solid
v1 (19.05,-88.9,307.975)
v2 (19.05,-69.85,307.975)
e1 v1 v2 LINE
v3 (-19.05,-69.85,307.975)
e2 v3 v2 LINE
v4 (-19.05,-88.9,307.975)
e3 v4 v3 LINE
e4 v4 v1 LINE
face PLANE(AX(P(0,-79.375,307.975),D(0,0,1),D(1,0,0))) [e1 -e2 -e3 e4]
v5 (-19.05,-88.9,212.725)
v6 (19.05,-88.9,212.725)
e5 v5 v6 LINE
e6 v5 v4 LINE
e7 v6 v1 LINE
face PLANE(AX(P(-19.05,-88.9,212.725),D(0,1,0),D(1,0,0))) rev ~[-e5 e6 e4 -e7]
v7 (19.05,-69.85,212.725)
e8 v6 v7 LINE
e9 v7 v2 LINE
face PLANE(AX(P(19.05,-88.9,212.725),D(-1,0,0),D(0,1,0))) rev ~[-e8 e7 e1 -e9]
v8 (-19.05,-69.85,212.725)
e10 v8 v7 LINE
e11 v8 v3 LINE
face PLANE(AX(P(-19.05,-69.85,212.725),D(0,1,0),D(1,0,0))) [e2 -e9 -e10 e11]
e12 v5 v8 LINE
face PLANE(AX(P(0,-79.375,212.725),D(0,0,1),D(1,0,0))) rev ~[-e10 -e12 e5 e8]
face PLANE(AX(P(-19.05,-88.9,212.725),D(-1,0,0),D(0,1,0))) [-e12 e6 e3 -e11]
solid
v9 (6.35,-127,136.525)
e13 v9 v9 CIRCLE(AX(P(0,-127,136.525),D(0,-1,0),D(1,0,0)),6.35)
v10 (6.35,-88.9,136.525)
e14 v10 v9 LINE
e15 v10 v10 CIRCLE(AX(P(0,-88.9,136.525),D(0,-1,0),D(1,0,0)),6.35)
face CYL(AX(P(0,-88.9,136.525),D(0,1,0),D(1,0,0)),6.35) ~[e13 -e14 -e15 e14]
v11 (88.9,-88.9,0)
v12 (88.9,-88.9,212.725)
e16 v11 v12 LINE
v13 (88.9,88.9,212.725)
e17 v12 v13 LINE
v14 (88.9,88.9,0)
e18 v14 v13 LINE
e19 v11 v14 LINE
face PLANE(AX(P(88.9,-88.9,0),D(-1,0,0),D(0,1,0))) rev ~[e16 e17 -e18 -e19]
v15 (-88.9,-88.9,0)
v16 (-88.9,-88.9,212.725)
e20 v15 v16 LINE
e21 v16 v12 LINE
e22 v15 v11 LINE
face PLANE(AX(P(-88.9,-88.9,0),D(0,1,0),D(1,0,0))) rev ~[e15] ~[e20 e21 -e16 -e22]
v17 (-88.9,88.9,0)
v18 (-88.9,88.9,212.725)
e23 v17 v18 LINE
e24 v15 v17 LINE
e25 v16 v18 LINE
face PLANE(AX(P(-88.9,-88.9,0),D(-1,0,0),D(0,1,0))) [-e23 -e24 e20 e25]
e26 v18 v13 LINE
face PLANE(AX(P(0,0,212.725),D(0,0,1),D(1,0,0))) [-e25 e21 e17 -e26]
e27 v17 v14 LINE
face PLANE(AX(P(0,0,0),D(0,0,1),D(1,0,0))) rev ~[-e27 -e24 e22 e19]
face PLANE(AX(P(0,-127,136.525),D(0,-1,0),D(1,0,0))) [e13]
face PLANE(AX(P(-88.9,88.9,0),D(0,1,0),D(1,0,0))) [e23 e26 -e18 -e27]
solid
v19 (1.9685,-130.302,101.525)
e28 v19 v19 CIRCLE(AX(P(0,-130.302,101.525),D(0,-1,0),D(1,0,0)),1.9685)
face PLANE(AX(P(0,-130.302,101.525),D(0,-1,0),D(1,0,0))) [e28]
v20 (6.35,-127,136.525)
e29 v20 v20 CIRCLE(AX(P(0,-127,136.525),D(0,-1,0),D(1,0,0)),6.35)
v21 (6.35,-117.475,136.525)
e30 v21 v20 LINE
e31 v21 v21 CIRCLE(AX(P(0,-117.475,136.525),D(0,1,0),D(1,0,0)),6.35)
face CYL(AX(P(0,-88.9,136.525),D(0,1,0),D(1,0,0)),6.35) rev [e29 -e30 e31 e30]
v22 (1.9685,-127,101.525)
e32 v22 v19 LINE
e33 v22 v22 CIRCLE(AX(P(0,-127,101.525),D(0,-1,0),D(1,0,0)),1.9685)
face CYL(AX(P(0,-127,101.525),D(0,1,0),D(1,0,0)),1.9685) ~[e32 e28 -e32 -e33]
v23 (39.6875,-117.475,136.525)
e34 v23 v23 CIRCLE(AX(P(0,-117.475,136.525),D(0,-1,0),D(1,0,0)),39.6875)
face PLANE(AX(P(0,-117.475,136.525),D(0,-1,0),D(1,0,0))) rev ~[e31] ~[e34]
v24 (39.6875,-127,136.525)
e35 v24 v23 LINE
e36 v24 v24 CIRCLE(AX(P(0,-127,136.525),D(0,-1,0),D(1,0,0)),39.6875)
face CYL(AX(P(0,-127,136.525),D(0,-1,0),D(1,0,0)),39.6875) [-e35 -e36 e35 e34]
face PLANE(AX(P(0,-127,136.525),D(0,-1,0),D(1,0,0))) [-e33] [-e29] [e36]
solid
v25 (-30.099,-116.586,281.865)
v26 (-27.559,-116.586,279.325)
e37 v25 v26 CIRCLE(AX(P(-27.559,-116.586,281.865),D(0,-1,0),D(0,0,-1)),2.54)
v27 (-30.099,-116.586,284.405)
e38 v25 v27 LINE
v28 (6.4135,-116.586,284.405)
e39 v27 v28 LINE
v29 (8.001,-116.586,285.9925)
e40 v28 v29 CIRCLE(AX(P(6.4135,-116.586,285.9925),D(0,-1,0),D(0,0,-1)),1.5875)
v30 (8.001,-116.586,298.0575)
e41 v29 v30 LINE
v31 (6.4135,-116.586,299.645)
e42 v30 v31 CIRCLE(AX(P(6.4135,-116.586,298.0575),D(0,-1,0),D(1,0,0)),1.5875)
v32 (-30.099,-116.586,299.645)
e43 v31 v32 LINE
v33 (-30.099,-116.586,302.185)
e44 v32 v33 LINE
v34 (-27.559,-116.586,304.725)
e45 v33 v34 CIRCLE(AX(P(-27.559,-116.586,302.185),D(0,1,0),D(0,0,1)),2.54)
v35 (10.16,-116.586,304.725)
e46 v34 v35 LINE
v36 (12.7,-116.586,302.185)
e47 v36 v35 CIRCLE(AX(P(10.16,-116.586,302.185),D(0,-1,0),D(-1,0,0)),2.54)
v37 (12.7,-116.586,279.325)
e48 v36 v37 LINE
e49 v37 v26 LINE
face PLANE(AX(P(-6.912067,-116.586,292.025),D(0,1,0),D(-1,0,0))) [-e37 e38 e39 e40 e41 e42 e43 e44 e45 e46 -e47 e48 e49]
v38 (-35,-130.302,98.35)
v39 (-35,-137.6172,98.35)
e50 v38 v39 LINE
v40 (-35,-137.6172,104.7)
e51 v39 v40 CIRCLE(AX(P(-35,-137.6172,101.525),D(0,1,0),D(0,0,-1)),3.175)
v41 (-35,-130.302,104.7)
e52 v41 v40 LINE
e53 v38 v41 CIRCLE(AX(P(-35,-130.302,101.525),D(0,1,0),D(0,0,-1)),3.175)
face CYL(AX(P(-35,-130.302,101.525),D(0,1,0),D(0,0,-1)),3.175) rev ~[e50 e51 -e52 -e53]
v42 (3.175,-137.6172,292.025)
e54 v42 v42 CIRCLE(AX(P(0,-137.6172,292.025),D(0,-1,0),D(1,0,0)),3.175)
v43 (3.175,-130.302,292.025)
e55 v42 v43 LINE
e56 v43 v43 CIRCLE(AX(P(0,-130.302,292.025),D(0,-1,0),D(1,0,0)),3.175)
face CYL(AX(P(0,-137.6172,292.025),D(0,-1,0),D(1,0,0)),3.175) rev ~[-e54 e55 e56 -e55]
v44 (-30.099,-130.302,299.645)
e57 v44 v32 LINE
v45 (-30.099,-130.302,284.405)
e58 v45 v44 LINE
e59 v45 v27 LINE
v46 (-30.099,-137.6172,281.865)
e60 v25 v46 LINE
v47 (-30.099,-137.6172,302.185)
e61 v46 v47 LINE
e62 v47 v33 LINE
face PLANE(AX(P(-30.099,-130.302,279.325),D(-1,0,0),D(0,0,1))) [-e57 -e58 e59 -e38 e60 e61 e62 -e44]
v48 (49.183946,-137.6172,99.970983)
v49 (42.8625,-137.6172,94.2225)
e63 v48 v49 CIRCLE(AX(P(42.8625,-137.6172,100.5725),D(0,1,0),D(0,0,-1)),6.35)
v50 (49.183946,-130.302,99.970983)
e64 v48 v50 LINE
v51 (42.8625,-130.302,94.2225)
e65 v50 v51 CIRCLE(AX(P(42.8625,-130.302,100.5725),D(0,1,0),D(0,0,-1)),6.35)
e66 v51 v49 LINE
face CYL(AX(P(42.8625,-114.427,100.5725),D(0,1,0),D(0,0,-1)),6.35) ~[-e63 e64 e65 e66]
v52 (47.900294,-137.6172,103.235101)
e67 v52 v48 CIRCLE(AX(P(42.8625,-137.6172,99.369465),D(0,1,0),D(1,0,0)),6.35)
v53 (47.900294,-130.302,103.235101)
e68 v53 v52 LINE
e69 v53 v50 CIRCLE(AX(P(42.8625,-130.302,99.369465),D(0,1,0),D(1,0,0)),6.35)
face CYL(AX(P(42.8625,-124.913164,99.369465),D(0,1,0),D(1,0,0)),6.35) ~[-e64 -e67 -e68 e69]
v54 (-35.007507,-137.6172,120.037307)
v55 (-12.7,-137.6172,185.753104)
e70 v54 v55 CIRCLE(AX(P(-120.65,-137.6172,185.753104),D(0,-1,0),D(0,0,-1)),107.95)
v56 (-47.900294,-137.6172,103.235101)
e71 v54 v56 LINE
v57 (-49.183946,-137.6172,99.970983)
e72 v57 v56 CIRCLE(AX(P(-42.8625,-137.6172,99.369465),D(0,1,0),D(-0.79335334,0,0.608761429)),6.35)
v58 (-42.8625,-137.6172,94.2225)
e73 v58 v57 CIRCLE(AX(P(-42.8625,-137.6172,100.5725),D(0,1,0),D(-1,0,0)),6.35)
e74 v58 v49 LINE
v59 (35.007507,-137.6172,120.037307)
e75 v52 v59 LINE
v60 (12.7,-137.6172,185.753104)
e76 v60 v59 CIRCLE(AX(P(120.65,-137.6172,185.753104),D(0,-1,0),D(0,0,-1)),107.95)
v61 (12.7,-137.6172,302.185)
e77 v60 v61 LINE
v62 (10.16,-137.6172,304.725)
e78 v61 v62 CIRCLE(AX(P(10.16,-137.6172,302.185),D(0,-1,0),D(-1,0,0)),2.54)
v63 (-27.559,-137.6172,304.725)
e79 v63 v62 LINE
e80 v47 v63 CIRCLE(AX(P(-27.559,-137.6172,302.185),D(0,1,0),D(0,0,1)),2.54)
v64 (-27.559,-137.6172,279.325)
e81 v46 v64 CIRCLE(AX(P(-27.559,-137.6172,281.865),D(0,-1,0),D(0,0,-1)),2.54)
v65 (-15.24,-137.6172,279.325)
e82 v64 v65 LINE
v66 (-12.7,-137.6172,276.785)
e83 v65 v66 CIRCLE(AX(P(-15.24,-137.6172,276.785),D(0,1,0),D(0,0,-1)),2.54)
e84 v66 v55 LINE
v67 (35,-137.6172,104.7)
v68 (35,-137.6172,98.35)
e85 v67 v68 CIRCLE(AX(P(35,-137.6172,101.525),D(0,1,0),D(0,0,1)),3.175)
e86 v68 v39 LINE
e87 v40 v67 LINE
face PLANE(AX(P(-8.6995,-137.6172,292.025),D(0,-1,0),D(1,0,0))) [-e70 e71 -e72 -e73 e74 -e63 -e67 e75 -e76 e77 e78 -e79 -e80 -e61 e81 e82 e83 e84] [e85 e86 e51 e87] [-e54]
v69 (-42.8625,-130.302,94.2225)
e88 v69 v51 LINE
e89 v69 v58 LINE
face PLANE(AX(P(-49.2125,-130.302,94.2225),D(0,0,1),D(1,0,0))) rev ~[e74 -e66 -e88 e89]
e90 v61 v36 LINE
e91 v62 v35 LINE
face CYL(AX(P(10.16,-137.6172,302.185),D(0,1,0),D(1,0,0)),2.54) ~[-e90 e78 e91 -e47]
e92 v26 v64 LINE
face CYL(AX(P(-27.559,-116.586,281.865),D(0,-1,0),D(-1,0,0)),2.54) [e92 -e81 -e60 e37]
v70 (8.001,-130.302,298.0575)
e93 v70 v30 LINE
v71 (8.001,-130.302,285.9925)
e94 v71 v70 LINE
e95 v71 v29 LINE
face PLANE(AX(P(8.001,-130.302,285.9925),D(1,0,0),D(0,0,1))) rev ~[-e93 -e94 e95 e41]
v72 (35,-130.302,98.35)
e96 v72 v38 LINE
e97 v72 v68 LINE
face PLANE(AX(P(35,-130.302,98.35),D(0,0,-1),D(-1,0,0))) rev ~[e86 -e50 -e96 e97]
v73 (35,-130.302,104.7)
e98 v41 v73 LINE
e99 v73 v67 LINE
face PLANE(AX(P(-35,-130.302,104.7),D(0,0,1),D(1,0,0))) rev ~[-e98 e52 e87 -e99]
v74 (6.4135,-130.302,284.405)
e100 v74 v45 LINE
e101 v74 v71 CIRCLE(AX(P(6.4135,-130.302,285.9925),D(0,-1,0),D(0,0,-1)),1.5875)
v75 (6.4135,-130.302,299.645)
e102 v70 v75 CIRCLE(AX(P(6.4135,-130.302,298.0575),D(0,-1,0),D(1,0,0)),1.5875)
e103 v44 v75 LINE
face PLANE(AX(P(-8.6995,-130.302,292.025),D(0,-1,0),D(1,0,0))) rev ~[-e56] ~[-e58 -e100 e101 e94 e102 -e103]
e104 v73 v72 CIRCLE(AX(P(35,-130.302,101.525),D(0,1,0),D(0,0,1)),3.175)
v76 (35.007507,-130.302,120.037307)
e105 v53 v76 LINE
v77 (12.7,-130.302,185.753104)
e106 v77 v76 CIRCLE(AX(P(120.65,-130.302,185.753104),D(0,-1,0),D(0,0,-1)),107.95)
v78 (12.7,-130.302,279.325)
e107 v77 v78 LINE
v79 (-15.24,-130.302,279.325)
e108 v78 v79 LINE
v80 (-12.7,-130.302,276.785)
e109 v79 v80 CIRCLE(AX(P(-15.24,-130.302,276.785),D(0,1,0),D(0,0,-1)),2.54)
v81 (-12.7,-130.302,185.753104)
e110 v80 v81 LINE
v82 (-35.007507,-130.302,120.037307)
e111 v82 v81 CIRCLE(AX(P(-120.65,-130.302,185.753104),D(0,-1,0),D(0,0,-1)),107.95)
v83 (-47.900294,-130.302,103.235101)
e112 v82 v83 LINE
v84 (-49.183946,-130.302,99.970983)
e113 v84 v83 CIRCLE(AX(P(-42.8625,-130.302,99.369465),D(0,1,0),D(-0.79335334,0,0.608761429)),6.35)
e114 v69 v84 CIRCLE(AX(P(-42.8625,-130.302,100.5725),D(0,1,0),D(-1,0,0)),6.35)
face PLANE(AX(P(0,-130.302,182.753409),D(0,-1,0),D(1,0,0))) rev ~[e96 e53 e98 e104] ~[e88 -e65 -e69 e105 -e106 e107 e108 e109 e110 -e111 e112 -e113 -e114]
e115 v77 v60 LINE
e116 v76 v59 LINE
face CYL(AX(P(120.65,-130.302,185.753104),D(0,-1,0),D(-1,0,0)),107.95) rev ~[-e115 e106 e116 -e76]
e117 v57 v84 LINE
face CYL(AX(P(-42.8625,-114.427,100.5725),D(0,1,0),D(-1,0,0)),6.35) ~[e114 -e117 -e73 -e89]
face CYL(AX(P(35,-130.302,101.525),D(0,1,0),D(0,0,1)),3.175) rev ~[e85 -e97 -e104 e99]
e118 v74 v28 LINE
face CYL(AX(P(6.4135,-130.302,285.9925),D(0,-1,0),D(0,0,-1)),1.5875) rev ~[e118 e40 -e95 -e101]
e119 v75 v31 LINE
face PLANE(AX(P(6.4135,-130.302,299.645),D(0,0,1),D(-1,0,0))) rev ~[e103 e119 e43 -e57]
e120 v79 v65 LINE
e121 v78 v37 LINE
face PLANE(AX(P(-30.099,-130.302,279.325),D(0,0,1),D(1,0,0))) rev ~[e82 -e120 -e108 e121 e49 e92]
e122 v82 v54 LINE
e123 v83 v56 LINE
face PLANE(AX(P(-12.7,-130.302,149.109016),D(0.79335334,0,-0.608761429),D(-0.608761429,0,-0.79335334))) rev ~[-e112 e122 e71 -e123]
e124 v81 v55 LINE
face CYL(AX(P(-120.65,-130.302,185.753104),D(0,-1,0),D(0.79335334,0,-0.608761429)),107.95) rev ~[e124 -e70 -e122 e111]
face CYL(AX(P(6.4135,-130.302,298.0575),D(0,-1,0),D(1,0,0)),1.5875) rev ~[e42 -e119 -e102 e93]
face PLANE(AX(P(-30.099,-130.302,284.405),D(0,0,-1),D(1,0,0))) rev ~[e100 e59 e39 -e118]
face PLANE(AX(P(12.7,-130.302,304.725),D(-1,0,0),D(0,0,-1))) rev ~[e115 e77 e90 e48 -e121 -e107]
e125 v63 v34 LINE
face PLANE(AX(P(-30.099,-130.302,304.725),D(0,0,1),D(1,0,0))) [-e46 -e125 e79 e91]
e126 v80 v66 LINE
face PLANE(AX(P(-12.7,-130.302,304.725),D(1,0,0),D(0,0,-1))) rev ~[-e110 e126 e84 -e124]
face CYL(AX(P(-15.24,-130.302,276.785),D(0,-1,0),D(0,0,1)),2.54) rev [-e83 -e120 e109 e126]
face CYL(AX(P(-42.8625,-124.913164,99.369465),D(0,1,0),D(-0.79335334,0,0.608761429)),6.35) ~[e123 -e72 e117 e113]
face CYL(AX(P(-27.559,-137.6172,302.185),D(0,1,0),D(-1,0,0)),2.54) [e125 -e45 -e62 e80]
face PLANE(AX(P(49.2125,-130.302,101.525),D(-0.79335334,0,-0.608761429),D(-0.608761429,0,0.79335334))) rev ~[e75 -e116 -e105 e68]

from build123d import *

# Parameters (mm, degrees)
F0_W         = 177.8
F0_H         = 177.8
F1_DEPTH     = 212.725
F2_W         = 38.1
F2_H         = 19.05
F3_DEPTH     = 95.25
F4_R         = 6.35
F5_DEPTH     = 38.1
F6_R         = 39.6875
F7_DEPTH     = 9.525
F9_R         = 1.9685
F10_DEPTH    = 3.302
F12_DEPTH    = 7.3152
F14_T1_DEPTH = 18.0928727189
F14_T3_DEPTH = 39.0652
F15_R        = 107.95
F16_R        = 3.175
F17_DEPTH    = 7.3152
F19_DEPTH    = 13.716
F20_W        = 42.799
F20_H        = 25.4
F20_R        = 3.175
F21_DEPTH    = 7.3152
F22_R        = 2.54


# Not quite as in the source:
# - a fillet or chamfer that OpenCascade refuses, or shapes differently, is made with other operations: its cross-section is extruded or revolved along the edge and cut away or added


with BuildPart() as f1:
    # F0 (on Top) → F1 (new body)
    with BuildSketch(Plane.XY):
        Rectangle(F0_W, F0_H)
    extrude(amount=F1_DEPTH)

    # F4 (on face) → F5 (join)
    with BuildSketch(Plane.XZ.offset(88.9)):
        with Locations((0, 136.525)):
            Circle(F4_R)
    extrude(amount=F5_DEPTH)


with BuildPart() as f3:
    # F2 (on face) → F3 (new body)
    with BuildSketch(Plane.XY.offset(212.725)):
        with Locations((0, -79.375)):
            Rectangle(F2_W, F2_H)
    extrude(amount=F3_DEPTH)


with BuildPart() as f7:
    # F6 (on face) → F7 (new body)
    with BuildSketch(Plane.XZ.offset(127)):
        with Locations((0, 136.525)):
            Circle(F6_R)
    extrude(amount=-F7_DEPTH)

    # F8: cut F1
    add(f1.part, mode=Mode.SUBTRACT)

    # F9 (on face) → F10 (join)
    with BuildSketch(Plane.XZ.offset(127)):
        with Locations((0, 101.525)):
            Circle(F9_R)
    extrude(amount=F10_DEPTH)


with BuildPart() as f12:
    # F11 (on face) → F12 (new body)
    with BuildSketch(Plane.XZ.offset(130.302)):
        Polygon((-49.2125, 94.2225), (49.2125, 94.2225), (49.2125, 101.525), (12.7, 149.1090164259), (12.7, 304.725), (-12.7, 304.725), (-12.7, 149.1090164259), (-49.2125, 101.525), align=None)
        with BuildLine():
            Line((-35, 104.7), (35, 104.7))
            ThreePointArc((35, 104.7), (38.175, 101.525), (35, 98.35))
            Line((35, 98.35), (-35, 98.35))
            ThreePointArc((-35, 98.35), (-38.175, 101.525), (-35, 104.7))
        make_face(mode=Mode.SUBTRACT)
    extrude(amount=F12_DEPTH)

    # F14: fillet of radius 6.35 on 4 edges, made by hand

    # F14_s2 → F14_t1 (cut)
    with BuildSketch(Plane.XZ.offset(124.9131636405)):
        with BuildLine():
            ThreePointArc((-47.9002937108, 103.2351005304), (-48.8755063223, 101.4106060609), (-49.2125, 99.3694654562))
            Line((-49.2125, 99.3694654562), (-49.2125, 101.525))
            Line((-49.2125, 101.525), (-47.9002937108, 103.2351005304))
        make_face()
        with BuildLine():
            ThreePointArc((49.2125, 99.3694654562), (48.8755063223, 101.4106060609), (47.9002937108, 103.2351005304))
            Line((47.9002937108, 103.2351005304), (49.2125, 101.525))
            Line((49.2125, 101.525), (49.2125, 99.3694654562))
        make_face()
    extrude(amount=F14_T1_DEPTH, mode=Mode.SUBTRACT)

    # F14_s4 → F14_t3 (cut)
    with BuildSketch(Plane.XZ.offset(114.427)):
        with BuildLine():
            ThreePointArc((-49.2125, 100.5725), (-47.3526280605, 96.0823719395), (-42.8625, 94.2225))
            Line((-42.8625, 94.2225), (-49.2125, 94.2225))
            Line((-49.2125, 94.2225), (-49.2125, 100.5725))
        make_face()
        with BuildLine():
            ThreePointArc((42.8625, 94.2225), (47.3526280605, 96.0823719395), (49.2125, 100.5725))
            Line((49.2125, 100.5725), (49.2125, 94.2225))
            Line((49.2125, 94.2225), (42.8625, 94.2225))
        make_face()
    extrude(amount=F14_T3_DEPTH, mode=Mode.SUBTRACT)

    # F15
    f15_edges = [f12.edges().sort_by_distance(p)[0] for p in [
        (-12.7, -133.9596, 149.109016),
        (12.7, -133.9596, 149.109016),
    ]]
    fillet(f15_edges, radius=F15_R)

    # F16 (on face) → F17 (cut, through all)
    with BuildSketch(Plane.XZ.offset(137.6172)):
        with Locations((0, 292.025)):
            Circle(F16_R)
    extrude(amount=-F17_DEPTH, mode=Mode.SUBTRACT)

    # F18 (on face) → F19 (join)
    with BuildSketch(Plane(origin=(0, -130.302, 0), x_dir=(-1, 0, 0), z_dir=(0, 1, 0))):
        with BuildLine():
            Line((-6.4135, 299.645), (30.099, 299.645))
            Line((30.099, 299.645), (30.099, 304.725))
            Line((30.099, 304.725), (-12.7, 304.725))
            Line((-12.7, 304.725), (-12.7, 279.325))
            Line((-12.7, 279.325), (30.099, 279.325))
            Line((30.099, 279.325), (30.099, 284.405))
            Line((30.099, 284.405), (-6.4135, 284.405))
            ThreePointArc((-6.4135, 284.405), (-7.5360320151, 284.8699679849), (-8.001, 285.9925))
            Line((-8.001, 285.9925), (-8.001, 298.0575))
            ThreePointArc((-8.001, 298.0575), (-7.5360320151, 299.1800320151), (-6.4135, 299.645))
        make_face()
    extrude(amount=F19_DEPTH)

    # F20 (on face) → F21 (join, through all)
    with BuildSketch(Plane.XZ.offset(130.302)):
        with Locations((-8.6995, 292.025)):
            Rectangle(F20_W, F20_H)
        with Locations((0, 292.025)):
            Circle(F20_R, mode=Mode.SUBTRACT)
    extrude(amount=F21_DEPTH)

    # F22
    f22_edges = [f12.edges().sort_by_distance(p)[0] for p in [
        (-12.7, -133.9596, 279.325),
        (-30.099, -127.1016, 279.325),
        (-30.099, -127.1016, 304.725),
        (12.7, -127.1016, 304.725),
    ]]
    fillet(f22_edges, radius=F22_R)


solid = Compound([f1.part, f3.part, f7.part, f12.part])
